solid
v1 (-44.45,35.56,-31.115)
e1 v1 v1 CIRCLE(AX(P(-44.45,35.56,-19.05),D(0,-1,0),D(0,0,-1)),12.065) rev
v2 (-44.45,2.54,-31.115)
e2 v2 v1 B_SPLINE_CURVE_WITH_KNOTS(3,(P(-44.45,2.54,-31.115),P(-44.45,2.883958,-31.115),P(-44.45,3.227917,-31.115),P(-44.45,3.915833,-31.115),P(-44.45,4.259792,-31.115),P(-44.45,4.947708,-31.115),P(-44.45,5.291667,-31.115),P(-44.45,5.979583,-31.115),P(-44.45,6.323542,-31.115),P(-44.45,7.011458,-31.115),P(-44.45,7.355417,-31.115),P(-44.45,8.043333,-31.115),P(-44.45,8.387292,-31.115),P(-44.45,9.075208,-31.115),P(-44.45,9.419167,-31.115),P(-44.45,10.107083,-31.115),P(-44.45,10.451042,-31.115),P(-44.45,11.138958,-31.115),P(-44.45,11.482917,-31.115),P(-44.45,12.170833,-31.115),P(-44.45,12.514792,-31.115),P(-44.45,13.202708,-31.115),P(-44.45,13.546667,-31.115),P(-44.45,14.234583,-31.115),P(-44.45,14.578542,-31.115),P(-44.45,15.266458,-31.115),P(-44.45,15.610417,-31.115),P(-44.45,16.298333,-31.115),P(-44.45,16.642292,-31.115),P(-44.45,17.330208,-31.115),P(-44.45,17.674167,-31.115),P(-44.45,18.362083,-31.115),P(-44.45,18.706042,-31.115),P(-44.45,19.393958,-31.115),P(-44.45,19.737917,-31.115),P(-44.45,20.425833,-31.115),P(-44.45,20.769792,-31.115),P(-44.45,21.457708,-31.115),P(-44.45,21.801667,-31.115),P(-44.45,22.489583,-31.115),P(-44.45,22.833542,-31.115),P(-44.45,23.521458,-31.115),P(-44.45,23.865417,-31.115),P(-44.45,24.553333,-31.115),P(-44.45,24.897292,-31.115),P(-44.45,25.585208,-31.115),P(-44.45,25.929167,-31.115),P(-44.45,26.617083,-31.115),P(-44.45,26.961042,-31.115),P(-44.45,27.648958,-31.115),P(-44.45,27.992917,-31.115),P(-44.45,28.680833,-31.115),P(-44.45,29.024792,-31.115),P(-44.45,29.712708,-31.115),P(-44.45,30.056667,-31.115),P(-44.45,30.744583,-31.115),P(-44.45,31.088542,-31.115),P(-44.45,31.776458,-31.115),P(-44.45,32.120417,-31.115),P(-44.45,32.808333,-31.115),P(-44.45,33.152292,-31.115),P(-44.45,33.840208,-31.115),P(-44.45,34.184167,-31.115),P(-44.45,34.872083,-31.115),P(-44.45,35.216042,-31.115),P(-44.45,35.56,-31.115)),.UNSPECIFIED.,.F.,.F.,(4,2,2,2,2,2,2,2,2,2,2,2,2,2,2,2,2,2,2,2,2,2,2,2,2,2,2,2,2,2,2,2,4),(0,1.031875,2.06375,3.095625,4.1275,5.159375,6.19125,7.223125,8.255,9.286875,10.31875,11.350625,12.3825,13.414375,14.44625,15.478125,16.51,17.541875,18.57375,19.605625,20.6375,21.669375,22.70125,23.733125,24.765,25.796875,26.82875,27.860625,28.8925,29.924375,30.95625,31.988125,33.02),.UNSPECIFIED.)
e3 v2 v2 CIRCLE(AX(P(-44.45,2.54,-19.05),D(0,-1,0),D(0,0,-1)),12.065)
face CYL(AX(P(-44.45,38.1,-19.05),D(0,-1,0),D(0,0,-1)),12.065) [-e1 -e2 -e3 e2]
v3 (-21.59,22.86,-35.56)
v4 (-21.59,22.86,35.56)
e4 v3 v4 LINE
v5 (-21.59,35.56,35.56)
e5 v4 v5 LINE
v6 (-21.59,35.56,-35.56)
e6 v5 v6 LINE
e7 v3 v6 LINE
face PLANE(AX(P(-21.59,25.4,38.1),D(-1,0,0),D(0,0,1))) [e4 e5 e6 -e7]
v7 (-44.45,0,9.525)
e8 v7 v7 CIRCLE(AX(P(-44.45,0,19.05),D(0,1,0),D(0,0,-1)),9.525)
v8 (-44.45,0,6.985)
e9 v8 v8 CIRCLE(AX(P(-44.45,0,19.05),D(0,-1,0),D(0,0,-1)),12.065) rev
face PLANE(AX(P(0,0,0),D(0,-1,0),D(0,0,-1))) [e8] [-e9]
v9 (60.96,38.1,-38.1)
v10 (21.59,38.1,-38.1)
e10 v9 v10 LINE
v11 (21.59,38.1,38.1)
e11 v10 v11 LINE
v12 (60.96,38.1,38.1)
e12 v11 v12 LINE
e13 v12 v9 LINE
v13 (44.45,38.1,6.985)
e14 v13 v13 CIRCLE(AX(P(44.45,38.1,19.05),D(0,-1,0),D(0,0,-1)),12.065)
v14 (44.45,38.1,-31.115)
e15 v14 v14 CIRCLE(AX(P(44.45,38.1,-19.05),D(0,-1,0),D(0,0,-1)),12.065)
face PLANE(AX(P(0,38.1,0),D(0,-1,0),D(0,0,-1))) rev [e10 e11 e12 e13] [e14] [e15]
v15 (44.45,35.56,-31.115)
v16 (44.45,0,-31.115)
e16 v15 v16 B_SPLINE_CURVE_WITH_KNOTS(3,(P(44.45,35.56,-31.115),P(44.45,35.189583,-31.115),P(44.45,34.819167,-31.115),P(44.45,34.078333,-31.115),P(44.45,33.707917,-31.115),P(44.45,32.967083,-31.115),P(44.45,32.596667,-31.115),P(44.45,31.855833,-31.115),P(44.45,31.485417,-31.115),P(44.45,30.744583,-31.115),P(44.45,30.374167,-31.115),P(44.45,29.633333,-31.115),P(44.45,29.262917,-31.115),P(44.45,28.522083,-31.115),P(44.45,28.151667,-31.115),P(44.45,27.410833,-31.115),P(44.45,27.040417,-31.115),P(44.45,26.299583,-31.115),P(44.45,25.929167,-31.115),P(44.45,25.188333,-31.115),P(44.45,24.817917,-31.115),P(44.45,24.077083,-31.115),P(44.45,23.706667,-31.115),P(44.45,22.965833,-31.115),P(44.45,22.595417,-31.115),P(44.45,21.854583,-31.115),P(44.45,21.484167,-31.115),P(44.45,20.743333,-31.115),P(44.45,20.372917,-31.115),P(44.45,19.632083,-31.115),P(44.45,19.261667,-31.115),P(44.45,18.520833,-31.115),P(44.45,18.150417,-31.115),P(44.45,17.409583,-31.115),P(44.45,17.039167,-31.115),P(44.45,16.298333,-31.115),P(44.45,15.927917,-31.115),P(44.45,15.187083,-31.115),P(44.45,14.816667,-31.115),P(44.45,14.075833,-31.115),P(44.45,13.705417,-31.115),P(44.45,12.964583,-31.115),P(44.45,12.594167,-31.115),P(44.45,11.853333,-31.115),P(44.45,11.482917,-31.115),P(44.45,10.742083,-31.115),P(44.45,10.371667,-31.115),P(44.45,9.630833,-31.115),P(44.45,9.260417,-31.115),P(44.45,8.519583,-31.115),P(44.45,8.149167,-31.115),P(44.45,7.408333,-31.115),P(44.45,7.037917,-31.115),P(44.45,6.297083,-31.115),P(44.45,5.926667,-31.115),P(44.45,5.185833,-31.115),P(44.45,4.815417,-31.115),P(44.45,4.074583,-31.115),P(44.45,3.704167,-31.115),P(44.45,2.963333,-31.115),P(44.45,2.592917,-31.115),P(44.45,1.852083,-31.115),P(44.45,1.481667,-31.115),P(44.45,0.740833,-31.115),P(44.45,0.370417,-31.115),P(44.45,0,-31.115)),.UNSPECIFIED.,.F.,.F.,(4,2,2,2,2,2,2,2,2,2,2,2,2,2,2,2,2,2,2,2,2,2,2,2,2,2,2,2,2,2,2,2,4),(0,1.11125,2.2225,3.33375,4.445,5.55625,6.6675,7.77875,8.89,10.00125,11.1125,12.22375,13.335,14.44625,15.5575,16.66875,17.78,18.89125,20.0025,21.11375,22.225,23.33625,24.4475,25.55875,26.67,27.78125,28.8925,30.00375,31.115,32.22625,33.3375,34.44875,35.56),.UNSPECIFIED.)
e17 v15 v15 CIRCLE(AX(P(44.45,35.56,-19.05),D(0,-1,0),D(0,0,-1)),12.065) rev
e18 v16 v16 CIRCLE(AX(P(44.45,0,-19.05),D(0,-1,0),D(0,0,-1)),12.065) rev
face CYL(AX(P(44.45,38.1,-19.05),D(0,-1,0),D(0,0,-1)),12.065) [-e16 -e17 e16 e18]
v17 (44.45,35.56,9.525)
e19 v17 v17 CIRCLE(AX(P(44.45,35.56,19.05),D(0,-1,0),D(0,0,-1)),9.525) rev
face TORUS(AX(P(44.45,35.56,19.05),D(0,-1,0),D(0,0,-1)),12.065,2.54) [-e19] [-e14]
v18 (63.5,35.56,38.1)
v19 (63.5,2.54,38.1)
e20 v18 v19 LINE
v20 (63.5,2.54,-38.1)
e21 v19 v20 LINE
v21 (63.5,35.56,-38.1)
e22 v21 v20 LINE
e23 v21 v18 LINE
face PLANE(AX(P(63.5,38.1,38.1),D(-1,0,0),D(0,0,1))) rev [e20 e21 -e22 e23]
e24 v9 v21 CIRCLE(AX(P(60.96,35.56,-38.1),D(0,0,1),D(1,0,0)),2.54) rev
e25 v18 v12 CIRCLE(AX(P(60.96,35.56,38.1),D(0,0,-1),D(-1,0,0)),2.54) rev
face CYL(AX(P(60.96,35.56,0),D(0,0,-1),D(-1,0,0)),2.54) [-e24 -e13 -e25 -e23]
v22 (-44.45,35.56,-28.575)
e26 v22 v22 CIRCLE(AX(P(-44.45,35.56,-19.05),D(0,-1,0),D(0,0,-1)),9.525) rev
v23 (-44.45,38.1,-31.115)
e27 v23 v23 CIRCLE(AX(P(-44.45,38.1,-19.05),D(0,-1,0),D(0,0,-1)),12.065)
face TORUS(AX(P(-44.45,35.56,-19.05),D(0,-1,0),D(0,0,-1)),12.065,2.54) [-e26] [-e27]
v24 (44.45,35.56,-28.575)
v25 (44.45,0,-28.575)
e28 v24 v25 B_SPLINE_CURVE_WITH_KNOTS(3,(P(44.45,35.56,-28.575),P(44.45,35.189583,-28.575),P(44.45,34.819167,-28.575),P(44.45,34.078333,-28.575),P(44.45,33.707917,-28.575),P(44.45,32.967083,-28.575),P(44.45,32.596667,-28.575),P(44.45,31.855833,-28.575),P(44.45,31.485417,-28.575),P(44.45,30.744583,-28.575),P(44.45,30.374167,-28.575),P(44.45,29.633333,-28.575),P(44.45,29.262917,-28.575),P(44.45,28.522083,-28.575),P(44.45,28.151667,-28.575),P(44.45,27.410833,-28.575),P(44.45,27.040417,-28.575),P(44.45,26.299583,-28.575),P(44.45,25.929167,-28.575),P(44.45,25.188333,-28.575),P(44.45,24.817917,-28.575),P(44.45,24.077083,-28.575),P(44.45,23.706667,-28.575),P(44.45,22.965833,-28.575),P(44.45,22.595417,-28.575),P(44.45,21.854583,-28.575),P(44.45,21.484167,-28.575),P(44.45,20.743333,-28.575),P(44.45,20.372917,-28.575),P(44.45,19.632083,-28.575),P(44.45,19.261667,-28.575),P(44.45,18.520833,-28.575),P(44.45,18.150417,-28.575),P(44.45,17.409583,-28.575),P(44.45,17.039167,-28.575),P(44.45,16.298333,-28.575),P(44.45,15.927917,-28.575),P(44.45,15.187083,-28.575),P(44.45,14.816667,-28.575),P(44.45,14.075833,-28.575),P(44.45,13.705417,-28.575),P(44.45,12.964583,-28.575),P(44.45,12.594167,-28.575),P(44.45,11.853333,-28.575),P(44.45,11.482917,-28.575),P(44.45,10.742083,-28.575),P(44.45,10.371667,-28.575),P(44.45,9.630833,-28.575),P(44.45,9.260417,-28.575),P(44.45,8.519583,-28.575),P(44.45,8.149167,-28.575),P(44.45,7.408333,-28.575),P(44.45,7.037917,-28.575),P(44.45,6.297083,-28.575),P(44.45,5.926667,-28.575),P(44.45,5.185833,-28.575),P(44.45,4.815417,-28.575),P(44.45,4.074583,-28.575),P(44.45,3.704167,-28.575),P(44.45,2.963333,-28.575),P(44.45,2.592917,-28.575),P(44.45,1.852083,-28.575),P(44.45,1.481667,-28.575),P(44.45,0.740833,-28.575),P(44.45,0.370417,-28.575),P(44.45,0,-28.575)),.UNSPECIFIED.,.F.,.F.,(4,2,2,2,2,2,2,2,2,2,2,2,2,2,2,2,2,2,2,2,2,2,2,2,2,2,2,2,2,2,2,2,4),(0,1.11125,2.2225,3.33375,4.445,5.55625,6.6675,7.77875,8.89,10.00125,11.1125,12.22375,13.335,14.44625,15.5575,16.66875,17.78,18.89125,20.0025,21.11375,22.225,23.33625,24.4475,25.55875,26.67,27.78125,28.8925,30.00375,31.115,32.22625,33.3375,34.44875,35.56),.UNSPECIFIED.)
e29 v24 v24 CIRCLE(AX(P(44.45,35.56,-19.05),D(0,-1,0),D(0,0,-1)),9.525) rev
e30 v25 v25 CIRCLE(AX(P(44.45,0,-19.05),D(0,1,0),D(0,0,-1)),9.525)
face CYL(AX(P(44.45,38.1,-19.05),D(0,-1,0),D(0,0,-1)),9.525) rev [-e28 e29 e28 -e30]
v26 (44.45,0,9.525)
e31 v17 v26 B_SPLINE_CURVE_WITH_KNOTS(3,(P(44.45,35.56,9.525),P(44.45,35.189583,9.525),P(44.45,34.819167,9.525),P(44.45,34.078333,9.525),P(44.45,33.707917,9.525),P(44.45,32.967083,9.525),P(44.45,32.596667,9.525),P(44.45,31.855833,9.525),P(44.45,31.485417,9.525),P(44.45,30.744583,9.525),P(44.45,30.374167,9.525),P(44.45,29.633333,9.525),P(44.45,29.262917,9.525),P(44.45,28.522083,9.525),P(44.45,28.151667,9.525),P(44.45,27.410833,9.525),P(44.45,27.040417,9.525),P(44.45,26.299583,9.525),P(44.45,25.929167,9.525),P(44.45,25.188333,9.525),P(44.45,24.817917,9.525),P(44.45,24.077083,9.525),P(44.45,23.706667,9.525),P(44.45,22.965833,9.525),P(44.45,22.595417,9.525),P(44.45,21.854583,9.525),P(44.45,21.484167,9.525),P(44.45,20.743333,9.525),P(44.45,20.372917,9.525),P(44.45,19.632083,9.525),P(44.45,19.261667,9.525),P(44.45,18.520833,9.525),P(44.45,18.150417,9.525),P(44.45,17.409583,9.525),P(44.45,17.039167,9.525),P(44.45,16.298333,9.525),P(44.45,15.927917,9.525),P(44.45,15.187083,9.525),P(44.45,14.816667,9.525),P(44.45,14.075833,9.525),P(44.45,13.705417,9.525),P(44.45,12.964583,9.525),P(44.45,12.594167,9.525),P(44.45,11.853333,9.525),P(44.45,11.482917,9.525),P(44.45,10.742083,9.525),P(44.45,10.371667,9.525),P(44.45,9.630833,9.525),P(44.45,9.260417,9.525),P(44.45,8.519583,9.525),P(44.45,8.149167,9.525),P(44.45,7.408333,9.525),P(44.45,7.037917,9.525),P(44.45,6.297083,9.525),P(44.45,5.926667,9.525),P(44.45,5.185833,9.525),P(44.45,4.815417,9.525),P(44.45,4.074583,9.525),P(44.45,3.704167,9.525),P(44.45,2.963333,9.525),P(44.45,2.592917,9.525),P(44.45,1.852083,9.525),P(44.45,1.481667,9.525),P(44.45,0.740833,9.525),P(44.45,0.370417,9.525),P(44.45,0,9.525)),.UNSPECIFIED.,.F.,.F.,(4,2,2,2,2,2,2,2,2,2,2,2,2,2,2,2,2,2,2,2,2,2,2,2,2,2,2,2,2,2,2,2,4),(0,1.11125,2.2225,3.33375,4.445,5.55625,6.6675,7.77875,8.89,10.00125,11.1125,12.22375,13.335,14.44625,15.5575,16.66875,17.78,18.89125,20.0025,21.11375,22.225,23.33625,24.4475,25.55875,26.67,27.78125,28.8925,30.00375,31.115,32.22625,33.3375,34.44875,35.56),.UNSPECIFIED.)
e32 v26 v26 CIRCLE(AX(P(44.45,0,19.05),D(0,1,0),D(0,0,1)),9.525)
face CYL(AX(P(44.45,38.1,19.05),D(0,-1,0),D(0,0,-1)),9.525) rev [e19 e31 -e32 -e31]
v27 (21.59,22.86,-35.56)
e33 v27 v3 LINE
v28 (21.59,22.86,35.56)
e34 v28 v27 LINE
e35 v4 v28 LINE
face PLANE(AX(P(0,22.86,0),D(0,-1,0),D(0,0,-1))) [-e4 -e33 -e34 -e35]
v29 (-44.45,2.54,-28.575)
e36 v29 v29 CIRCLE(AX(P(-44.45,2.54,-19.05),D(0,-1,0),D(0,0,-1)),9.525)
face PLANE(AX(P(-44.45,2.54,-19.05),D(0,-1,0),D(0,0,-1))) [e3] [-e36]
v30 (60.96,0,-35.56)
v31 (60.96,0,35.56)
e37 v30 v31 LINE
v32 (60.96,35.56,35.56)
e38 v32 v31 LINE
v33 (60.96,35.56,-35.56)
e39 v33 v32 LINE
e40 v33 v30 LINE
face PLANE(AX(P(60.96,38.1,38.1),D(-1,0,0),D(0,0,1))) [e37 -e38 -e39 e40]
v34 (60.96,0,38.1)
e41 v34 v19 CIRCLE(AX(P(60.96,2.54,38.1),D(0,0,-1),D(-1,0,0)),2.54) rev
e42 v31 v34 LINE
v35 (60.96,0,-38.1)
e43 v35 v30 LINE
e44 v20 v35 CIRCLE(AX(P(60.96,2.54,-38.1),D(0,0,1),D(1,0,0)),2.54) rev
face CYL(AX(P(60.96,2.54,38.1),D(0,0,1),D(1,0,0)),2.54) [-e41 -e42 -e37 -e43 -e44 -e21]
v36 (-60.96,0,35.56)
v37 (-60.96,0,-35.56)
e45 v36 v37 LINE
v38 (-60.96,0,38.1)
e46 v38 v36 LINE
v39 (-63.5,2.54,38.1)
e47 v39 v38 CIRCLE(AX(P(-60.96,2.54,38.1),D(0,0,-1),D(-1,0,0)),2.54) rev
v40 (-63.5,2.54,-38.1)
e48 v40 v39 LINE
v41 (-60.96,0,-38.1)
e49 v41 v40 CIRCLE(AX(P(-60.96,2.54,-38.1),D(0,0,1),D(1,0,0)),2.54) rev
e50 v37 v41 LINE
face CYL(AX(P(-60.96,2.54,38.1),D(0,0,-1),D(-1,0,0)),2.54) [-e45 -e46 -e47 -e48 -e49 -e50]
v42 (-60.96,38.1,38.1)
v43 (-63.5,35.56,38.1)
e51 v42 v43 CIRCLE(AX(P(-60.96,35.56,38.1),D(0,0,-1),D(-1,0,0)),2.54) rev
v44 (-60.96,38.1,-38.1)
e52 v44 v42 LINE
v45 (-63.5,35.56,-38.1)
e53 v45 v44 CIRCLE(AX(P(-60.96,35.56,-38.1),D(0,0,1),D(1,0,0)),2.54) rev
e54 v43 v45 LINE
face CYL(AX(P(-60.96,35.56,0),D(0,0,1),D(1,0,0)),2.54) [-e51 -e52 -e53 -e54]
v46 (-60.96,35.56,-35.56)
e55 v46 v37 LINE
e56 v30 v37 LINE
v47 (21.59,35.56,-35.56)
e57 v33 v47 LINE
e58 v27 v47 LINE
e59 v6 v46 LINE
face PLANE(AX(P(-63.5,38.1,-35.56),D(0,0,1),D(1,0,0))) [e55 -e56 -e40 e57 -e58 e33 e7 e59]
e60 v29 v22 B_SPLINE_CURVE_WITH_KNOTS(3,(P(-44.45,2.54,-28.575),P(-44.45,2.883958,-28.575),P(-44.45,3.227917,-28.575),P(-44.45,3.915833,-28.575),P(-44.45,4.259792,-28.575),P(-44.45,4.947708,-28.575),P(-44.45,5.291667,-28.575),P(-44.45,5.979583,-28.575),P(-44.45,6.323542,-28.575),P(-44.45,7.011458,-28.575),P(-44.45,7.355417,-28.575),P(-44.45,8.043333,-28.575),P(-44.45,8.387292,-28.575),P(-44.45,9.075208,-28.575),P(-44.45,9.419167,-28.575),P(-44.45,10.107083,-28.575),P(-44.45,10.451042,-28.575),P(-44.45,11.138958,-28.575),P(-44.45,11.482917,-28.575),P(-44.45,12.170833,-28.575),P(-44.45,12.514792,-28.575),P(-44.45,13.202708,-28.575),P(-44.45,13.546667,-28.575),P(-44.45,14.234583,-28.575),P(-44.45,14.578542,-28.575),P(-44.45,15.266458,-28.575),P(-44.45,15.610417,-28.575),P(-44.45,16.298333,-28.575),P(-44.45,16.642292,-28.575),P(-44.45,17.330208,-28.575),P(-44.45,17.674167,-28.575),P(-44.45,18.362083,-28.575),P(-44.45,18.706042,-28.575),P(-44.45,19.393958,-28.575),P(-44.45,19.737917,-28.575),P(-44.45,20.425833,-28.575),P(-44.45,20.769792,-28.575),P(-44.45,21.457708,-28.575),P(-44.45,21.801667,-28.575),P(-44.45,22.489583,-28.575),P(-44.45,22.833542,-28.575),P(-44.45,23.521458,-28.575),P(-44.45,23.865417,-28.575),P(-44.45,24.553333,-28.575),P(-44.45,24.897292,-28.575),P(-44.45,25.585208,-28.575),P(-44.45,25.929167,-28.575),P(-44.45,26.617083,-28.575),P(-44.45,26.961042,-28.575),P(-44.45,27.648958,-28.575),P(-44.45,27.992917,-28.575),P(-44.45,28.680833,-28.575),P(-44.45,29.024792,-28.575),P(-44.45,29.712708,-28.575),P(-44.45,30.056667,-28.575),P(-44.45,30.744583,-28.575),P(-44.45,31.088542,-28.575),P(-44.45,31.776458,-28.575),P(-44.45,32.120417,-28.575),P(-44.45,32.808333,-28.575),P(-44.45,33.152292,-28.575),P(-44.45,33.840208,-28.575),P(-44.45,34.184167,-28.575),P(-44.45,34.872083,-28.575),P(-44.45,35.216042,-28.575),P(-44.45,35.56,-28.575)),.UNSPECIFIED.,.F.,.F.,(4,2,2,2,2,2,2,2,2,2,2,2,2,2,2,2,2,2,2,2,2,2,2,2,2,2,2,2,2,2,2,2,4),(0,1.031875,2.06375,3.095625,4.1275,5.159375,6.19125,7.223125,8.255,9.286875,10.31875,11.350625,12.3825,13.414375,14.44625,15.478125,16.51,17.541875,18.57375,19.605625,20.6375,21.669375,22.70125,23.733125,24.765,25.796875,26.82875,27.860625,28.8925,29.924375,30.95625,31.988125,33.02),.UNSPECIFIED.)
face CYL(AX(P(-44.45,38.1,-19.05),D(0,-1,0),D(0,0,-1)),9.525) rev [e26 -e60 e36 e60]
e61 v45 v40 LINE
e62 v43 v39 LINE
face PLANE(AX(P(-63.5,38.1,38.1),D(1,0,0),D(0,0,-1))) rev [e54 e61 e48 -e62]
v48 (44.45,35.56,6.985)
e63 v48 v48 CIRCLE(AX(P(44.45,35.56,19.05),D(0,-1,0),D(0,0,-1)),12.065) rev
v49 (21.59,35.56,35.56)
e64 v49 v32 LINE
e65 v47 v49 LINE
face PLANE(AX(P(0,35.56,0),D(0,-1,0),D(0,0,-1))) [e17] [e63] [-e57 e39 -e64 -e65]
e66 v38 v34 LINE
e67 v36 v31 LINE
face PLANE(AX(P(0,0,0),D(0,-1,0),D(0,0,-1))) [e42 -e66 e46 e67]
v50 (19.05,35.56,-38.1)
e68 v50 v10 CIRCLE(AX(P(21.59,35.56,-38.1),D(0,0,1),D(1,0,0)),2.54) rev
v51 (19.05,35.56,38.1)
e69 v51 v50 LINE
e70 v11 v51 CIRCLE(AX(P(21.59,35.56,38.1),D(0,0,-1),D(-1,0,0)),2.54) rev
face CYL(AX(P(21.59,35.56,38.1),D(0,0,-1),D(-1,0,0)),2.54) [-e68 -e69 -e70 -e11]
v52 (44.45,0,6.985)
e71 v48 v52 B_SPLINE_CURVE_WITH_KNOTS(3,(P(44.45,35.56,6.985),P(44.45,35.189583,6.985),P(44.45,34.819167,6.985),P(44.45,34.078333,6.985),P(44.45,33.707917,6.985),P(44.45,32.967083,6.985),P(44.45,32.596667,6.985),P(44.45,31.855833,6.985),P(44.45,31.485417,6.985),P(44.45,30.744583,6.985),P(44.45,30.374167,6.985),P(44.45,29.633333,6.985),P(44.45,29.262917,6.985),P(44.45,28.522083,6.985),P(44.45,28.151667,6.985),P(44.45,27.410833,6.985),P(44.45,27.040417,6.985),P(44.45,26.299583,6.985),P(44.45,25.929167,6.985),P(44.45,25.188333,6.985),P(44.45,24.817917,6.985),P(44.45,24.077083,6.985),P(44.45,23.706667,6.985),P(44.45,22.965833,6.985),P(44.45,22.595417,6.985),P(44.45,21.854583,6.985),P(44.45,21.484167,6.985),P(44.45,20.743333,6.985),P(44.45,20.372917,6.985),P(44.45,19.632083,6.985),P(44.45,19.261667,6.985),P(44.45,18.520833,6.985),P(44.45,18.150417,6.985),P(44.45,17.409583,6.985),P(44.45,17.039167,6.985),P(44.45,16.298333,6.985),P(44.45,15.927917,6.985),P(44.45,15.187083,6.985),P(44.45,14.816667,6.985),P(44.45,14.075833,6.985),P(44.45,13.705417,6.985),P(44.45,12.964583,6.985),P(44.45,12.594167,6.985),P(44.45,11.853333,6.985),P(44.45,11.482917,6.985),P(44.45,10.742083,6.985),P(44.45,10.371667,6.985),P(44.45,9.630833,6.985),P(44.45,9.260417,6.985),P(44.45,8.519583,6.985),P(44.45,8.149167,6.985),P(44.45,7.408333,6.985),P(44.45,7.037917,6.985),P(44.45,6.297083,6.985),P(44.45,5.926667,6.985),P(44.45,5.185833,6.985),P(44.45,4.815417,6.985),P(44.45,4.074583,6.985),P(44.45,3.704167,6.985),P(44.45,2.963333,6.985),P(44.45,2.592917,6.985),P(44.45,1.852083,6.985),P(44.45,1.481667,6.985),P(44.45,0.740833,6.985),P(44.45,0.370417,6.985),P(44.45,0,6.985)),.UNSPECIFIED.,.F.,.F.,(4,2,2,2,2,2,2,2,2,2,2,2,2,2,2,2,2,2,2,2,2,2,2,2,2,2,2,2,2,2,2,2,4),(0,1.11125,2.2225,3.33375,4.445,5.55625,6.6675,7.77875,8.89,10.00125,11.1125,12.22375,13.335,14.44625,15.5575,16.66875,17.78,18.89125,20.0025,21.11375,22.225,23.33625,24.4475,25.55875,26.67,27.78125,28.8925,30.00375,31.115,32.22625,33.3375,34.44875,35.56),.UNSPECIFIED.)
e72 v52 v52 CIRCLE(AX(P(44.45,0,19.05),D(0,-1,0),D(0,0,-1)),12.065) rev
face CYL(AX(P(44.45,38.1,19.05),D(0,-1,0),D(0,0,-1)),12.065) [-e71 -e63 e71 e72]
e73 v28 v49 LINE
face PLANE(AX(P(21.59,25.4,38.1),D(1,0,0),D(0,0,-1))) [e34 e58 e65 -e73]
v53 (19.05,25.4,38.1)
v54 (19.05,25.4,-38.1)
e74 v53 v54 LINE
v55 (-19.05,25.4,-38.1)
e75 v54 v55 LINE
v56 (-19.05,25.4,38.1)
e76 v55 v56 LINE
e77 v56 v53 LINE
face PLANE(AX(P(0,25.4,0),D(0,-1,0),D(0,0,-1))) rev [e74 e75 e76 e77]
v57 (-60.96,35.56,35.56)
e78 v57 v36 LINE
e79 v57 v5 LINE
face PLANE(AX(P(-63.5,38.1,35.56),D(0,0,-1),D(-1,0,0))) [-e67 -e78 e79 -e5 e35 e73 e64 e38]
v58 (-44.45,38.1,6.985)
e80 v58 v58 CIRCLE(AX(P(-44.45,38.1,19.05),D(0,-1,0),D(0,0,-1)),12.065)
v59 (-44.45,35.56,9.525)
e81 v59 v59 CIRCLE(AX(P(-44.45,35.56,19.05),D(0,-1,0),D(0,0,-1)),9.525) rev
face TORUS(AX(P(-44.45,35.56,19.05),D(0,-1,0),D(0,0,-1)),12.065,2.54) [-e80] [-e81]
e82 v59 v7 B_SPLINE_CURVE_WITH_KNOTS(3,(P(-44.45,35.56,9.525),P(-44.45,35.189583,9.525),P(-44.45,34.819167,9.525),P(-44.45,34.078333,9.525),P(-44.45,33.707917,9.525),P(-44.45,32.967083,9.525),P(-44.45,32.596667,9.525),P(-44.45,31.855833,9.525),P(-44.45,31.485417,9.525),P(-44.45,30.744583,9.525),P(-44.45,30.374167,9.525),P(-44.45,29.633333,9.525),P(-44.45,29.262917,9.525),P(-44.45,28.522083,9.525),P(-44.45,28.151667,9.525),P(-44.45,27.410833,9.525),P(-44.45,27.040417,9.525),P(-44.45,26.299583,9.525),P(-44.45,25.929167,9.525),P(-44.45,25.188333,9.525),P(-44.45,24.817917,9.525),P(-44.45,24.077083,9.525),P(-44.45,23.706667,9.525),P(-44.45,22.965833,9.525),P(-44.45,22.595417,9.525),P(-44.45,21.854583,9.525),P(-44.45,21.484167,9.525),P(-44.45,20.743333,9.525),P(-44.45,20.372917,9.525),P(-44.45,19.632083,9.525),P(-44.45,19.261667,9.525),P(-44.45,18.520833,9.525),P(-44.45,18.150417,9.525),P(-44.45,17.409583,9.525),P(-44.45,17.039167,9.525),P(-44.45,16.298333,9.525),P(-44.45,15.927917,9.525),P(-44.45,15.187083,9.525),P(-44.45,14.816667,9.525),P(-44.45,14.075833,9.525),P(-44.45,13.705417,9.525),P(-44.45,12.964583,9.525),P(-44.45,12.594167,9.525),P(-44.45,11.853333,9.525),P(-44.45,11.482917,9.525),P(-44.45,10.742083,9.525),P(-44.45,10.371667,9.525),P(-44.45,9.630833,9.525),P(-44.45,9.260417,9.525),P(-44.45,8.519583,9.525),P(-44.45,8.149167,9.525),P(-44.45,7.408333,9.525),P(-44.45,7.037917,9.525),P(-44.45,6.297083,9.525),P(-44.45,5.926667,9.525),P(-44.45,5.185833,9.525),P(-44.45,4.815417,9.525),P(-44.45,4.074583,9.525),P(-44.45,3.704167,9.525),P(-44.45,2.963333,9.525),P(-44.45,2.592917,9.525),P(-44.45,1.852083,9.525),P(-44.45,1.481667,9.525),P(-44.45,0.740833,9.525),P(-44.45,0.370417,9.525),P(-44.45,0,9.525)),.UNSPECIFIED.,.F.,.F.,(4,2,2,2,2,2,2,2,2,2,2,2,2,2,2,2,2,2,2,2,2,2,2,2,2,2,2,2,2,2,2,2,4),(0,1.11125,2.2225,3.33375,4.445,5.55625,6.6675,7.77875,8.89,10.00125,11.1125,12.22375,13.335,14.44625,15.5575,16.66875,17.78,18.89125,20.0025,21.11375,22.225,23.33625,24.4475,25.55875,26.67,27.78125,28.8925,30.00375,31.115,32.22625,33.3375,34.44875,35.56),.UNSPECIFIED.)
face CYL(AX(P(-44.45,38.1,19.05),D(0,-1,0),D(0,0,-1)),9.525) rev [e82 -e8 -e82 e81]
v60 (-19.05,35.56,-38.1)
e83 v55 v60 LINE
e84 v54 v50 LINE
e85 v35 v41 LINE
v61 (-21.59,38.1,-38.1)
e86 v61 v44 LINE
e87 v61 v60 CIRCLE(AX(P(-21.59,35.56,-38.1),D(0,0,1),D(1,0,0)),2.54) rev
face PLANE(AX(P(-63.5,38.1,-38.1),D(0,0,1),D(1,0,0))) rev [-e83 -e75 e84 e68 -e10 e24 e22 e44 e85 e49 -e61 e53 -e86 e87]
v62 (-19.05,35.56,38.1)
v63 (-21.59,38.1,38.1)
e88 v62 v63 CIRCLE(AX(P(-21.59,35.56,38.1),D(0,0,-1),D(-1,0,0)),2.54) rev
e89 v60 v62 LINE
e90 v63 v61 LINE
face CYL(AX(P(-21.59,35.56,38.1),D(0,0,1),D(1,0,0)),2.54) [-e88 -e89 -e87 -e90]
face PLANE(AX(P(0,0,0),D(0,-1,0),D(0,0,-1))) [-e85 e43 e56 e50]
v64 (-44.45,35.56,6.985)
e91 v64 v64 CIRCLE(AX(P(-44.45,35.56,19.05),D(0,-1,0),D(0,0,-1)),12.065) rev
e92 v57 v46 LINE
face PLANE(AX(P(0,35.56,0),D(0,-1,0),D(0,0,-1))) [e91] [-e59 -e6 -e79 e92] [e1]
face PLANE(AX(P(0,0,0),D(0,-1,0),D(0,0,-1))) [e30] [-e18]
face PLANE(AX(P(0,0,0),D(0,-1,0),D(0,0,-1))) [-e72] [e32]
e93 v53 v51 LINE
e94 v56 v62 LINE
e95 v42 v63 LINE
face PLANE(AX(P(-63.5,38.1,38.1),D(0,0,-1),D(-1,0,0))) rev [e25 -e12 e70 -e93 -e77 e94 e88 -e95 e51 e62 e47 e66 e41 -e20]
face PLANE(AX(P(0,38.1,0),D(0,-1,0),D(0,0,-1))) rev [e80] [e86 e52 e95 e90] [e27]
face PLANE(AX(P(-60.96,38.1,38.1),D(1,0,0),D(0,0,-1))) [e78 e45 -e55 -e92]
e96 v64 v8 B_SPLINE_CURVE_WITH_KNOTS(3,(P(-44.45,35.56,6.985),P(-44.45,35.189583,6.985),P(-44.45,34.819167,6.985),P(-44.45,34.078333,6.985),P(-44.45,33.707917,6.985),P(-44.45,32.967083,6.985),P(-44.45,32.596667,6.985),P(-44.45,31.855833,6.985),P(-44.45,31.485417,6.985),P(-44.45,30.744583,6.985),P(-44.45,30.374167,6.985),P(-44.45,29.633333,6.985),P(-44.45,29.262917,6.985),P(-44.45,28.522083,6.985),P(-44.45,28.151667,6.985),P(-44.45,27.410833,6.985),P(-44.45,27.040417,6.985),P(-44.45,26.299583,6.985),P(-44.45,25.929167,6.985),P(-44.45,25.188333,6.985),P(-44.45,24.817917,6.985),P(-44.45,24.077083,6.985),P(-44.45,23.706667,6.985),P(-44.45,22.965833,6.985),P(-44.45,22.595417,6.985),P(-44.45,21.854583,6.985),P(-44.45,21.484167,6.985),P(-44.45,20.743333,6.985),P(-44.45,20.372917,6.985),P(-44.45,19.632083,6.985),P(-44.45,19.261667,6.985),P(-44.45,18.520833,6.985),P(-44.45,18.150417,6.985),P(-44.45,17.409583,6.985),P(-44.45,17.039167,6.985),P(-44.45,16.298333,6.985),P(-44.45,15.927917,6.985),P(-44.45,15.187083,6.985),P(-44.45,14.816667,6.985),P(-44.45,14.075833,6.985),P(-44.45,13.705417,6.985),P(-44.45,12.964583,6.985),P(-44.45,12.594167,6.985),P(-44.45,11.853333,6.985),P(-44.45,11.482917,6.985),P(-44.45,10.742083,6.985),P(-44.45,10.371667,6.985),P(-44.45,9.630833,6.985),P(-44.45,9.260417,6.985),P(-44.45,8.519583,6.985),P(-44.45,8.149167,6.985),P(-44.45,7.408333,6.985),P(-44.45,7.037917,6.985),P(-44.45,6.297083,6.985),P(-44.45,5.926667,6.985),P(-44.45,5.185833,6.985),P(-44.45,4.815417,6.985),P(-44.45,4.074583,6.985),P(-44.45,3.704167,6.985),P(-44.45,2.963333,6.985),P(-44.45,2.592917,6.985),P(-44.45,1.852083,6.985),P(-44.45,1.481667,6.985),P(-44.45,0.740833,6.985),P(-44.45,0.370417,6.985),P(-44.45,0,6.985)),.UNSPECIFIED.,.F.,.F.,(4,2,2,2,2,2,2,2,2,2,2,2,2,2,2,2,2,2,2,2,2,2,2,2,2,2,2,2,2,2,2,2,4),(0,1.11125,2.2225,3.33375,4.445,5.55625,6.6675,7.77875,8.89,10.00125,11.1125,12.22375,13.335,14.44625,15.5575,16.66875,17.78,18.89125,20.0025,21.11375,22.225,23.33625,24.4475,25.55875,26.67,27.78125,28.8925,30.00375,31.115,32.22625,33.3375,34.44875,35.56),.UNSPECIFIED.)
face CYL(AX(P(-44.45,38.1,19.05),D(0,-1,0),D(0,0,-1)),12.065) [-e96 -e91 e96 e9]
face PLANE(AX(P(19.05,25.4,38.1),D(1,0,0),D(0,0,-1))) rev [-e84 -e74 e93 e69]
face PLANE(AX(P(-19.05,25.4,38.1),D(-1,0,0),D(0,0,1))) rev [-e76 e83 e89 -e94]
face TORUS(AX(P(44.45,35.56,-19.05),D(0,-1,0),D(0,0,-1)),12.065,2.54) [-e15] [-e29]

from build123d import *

# Parameters (mm, degrees)
SKETCH1_W           = 127
SKETCH1_H           = 76.2
SKETCH1_R           = 9.525
BOSS_EXTRUDE1_DEPTH = 38.1
SKETCH2_W           = 38.1
SKETCH2_H           = 76.2
CUT_EXTRUDE1_DEPTH  = 12.7
FILLET1_R           = 2.54
SHELL1_OUTLINE_W    = 121.92
SHELL1_OUTLINE_H    = 71.12
SHELL1_OUTLINE_R    = 12.065
SHELL1_DEPTH        = 22.86
SHELL1_START        = 22.86
SHELL1_2_OUTLINE_W  = 39.37
SHELL1_2_OUTLINE_H  = 71.12
SHELL1_2_OUTLINE_R  = 12.065
SHELL1_2_DEPTH      = 12.7
SHELL1_3_OUTLINE_R  = 12.065
SHELL1_3_DEPTH      = 2.54


# Read off the part's stored shape, not the designer's step: Shell1
with BuildPart() as part:
    # Sketch1 → Boss-Extrude1 (new body)
    with BuildSketch(Plane(origin=(0, 0, 0), x_dir=(1, 0, 0), z_dir=(0, 1, 0))):
        Rectangle(SKETCH1_W, SKETCH1_H)
        with Locations(Location((-44.45, 19.05, 0), (0, 0, 90))):
            Circle(SKETCH1_R, mode=Mode.SUBTRACT)
        with Locations(Location((44.45, 19.05, 0), (0, 0, 90))):
            Circle(SKETCH1_R, mode=Mode.SUBTRACT)
        with Locations(Location((-44.45, -19.05, 0), (0, 0, 90))):
            Circle(SKETCH1_R, mode=Mode.SUBTRACT)
        with Locations(Location((44.45, -19.05, 0), (0, 0, 90))):
            Circle(SKETCH1_R, mode=Mode.SUBTRACT)
    extrude(amount=BOSS_EXTRUDE1_DEPTH)

    # Sketch2 → Cut-Extrude1 (cut)
    with BuildSketch(Plane(origin=(0, 38.1, 0), x_dir=(1, 0, 0), z_dir=(0, 1, 0))):
        Rectangle(SKETCH2_W, SKETCH2_H)
    extrude(amount=-CUT_EXTRUDE1_DEPTH, mode=Mode.SUBTRACT)

    # Fillet1
    fillet1_edges = [part.edges().sort_by_distance(p)[0] for p in [
        (-44.45, 0, -9.525),
        (-44.45, 38.1, -9.525),
        (-63.5, 38.1, 0),
        (44.45, 38.1, -9.525),
        (-44.45, 38.1, 28.575),
        (44.45, 38.1, 28.575),
        (19.05, 38.1, 0),
        (-19.05, 38.1, 0),
        (63.5, 38.1, 0),
        (-63.5, 0, 0),
        (63.5, 0, 0),
    ]]
    fillet(fillet1_edges, radius=FILLET1_R)

    # Shell1 outline → Shell1 (cut)
    with BuildSketch(Plane(origin=(0, 0, 0), x_dir=(1, 0, 0), z_dir=(0, 1, 0))):
        Rectangle(SHELL1_OUTLINE_W, SHELL1_OUTLINE_H)
        with Locations((44.45, -19.05)):
            Circle(SHELL1_OUTLINE_R, mode=Mode.SUBTRACT)
        with Locations((44.45, 19.05)):
            Circle(SHELL1_OUTLINE_R, mode=Mode.SUBTRACT)
        with Locations((-44.45, 19.05)):
            Circle(SHELL1_OUTLINE_R, mode=Mode.SUBTRACT)
        with Locations((-44.45, -19.05)):
            Circle(SHELL1_OUTLINE_R, mode=Mode.SUBTRACT)
    extrude(amount=SHELL1_DEPTH, mode=Mode.SUBTRACT)

    # Shell1 2 outline → Shell1 2 (cut)
    # profile 1 of 2: a face of its own
    with BuildSketch(Plane(origin=(0, 0, 0), x_dir=(1, 0, 0), z_dir=(0, 1, 0)).offset(SHELL1_START)):
        with Locations((41.275, 0)):
            Rectangle(SHELL1_2_OUTLINE_W, SHELL1_2_OUTLINE_H)
        with Locations((44.45, -19.05)):
            Circle(SHELL1_2_OUTLINE_R, mode=Mode.SUBTRACT)
        with Locations((44.45, 19.05)):
            Circle(SHELL1_2_OUTLINE_R, mode=Mode.SUBTRACT)
    # profile 2 of 2: a face of its own
    with BuildSketch(Plane(origin=(0, 0, 0), x_dir=(1, 0, 0), z_dir=(0, 1, 0)).offset(SHELL1_START)):
        with Locations((-41.275, 0)):
            Rectangle(SHELL1_2_OUTLINE_W, SHELL1_2_OUTLINE_H)
        with Locations((-44.45, -19.05)):
            Circle(SHELL1_2_OUTLINE_R, mode=Mode.SUBTRACT)
        with Locations((-44.45, 19.05)):
            Circle(SHELL1_2_OUTLINE_R, mode=Mode.SUBTRACT)
    extrude(amount=SHELL1_2_DEPTH, mode=Mode.SUBTRACT)

    # Shell1 3 outline → Shell1 3 (cut)
    with BuildSketch(Plane(origin=(0, 0, 0), x_dir=(1, 0, 0), z_dir=(0, 1, 0))):
        with Locations((-44.45, 19.05)):
            Circle(SHELL1_3_OUTLINE_R)
    extrude(amount=SHELL1_3_DEPTH, mode=Mode.SUBTRACT)


solid = part.part
